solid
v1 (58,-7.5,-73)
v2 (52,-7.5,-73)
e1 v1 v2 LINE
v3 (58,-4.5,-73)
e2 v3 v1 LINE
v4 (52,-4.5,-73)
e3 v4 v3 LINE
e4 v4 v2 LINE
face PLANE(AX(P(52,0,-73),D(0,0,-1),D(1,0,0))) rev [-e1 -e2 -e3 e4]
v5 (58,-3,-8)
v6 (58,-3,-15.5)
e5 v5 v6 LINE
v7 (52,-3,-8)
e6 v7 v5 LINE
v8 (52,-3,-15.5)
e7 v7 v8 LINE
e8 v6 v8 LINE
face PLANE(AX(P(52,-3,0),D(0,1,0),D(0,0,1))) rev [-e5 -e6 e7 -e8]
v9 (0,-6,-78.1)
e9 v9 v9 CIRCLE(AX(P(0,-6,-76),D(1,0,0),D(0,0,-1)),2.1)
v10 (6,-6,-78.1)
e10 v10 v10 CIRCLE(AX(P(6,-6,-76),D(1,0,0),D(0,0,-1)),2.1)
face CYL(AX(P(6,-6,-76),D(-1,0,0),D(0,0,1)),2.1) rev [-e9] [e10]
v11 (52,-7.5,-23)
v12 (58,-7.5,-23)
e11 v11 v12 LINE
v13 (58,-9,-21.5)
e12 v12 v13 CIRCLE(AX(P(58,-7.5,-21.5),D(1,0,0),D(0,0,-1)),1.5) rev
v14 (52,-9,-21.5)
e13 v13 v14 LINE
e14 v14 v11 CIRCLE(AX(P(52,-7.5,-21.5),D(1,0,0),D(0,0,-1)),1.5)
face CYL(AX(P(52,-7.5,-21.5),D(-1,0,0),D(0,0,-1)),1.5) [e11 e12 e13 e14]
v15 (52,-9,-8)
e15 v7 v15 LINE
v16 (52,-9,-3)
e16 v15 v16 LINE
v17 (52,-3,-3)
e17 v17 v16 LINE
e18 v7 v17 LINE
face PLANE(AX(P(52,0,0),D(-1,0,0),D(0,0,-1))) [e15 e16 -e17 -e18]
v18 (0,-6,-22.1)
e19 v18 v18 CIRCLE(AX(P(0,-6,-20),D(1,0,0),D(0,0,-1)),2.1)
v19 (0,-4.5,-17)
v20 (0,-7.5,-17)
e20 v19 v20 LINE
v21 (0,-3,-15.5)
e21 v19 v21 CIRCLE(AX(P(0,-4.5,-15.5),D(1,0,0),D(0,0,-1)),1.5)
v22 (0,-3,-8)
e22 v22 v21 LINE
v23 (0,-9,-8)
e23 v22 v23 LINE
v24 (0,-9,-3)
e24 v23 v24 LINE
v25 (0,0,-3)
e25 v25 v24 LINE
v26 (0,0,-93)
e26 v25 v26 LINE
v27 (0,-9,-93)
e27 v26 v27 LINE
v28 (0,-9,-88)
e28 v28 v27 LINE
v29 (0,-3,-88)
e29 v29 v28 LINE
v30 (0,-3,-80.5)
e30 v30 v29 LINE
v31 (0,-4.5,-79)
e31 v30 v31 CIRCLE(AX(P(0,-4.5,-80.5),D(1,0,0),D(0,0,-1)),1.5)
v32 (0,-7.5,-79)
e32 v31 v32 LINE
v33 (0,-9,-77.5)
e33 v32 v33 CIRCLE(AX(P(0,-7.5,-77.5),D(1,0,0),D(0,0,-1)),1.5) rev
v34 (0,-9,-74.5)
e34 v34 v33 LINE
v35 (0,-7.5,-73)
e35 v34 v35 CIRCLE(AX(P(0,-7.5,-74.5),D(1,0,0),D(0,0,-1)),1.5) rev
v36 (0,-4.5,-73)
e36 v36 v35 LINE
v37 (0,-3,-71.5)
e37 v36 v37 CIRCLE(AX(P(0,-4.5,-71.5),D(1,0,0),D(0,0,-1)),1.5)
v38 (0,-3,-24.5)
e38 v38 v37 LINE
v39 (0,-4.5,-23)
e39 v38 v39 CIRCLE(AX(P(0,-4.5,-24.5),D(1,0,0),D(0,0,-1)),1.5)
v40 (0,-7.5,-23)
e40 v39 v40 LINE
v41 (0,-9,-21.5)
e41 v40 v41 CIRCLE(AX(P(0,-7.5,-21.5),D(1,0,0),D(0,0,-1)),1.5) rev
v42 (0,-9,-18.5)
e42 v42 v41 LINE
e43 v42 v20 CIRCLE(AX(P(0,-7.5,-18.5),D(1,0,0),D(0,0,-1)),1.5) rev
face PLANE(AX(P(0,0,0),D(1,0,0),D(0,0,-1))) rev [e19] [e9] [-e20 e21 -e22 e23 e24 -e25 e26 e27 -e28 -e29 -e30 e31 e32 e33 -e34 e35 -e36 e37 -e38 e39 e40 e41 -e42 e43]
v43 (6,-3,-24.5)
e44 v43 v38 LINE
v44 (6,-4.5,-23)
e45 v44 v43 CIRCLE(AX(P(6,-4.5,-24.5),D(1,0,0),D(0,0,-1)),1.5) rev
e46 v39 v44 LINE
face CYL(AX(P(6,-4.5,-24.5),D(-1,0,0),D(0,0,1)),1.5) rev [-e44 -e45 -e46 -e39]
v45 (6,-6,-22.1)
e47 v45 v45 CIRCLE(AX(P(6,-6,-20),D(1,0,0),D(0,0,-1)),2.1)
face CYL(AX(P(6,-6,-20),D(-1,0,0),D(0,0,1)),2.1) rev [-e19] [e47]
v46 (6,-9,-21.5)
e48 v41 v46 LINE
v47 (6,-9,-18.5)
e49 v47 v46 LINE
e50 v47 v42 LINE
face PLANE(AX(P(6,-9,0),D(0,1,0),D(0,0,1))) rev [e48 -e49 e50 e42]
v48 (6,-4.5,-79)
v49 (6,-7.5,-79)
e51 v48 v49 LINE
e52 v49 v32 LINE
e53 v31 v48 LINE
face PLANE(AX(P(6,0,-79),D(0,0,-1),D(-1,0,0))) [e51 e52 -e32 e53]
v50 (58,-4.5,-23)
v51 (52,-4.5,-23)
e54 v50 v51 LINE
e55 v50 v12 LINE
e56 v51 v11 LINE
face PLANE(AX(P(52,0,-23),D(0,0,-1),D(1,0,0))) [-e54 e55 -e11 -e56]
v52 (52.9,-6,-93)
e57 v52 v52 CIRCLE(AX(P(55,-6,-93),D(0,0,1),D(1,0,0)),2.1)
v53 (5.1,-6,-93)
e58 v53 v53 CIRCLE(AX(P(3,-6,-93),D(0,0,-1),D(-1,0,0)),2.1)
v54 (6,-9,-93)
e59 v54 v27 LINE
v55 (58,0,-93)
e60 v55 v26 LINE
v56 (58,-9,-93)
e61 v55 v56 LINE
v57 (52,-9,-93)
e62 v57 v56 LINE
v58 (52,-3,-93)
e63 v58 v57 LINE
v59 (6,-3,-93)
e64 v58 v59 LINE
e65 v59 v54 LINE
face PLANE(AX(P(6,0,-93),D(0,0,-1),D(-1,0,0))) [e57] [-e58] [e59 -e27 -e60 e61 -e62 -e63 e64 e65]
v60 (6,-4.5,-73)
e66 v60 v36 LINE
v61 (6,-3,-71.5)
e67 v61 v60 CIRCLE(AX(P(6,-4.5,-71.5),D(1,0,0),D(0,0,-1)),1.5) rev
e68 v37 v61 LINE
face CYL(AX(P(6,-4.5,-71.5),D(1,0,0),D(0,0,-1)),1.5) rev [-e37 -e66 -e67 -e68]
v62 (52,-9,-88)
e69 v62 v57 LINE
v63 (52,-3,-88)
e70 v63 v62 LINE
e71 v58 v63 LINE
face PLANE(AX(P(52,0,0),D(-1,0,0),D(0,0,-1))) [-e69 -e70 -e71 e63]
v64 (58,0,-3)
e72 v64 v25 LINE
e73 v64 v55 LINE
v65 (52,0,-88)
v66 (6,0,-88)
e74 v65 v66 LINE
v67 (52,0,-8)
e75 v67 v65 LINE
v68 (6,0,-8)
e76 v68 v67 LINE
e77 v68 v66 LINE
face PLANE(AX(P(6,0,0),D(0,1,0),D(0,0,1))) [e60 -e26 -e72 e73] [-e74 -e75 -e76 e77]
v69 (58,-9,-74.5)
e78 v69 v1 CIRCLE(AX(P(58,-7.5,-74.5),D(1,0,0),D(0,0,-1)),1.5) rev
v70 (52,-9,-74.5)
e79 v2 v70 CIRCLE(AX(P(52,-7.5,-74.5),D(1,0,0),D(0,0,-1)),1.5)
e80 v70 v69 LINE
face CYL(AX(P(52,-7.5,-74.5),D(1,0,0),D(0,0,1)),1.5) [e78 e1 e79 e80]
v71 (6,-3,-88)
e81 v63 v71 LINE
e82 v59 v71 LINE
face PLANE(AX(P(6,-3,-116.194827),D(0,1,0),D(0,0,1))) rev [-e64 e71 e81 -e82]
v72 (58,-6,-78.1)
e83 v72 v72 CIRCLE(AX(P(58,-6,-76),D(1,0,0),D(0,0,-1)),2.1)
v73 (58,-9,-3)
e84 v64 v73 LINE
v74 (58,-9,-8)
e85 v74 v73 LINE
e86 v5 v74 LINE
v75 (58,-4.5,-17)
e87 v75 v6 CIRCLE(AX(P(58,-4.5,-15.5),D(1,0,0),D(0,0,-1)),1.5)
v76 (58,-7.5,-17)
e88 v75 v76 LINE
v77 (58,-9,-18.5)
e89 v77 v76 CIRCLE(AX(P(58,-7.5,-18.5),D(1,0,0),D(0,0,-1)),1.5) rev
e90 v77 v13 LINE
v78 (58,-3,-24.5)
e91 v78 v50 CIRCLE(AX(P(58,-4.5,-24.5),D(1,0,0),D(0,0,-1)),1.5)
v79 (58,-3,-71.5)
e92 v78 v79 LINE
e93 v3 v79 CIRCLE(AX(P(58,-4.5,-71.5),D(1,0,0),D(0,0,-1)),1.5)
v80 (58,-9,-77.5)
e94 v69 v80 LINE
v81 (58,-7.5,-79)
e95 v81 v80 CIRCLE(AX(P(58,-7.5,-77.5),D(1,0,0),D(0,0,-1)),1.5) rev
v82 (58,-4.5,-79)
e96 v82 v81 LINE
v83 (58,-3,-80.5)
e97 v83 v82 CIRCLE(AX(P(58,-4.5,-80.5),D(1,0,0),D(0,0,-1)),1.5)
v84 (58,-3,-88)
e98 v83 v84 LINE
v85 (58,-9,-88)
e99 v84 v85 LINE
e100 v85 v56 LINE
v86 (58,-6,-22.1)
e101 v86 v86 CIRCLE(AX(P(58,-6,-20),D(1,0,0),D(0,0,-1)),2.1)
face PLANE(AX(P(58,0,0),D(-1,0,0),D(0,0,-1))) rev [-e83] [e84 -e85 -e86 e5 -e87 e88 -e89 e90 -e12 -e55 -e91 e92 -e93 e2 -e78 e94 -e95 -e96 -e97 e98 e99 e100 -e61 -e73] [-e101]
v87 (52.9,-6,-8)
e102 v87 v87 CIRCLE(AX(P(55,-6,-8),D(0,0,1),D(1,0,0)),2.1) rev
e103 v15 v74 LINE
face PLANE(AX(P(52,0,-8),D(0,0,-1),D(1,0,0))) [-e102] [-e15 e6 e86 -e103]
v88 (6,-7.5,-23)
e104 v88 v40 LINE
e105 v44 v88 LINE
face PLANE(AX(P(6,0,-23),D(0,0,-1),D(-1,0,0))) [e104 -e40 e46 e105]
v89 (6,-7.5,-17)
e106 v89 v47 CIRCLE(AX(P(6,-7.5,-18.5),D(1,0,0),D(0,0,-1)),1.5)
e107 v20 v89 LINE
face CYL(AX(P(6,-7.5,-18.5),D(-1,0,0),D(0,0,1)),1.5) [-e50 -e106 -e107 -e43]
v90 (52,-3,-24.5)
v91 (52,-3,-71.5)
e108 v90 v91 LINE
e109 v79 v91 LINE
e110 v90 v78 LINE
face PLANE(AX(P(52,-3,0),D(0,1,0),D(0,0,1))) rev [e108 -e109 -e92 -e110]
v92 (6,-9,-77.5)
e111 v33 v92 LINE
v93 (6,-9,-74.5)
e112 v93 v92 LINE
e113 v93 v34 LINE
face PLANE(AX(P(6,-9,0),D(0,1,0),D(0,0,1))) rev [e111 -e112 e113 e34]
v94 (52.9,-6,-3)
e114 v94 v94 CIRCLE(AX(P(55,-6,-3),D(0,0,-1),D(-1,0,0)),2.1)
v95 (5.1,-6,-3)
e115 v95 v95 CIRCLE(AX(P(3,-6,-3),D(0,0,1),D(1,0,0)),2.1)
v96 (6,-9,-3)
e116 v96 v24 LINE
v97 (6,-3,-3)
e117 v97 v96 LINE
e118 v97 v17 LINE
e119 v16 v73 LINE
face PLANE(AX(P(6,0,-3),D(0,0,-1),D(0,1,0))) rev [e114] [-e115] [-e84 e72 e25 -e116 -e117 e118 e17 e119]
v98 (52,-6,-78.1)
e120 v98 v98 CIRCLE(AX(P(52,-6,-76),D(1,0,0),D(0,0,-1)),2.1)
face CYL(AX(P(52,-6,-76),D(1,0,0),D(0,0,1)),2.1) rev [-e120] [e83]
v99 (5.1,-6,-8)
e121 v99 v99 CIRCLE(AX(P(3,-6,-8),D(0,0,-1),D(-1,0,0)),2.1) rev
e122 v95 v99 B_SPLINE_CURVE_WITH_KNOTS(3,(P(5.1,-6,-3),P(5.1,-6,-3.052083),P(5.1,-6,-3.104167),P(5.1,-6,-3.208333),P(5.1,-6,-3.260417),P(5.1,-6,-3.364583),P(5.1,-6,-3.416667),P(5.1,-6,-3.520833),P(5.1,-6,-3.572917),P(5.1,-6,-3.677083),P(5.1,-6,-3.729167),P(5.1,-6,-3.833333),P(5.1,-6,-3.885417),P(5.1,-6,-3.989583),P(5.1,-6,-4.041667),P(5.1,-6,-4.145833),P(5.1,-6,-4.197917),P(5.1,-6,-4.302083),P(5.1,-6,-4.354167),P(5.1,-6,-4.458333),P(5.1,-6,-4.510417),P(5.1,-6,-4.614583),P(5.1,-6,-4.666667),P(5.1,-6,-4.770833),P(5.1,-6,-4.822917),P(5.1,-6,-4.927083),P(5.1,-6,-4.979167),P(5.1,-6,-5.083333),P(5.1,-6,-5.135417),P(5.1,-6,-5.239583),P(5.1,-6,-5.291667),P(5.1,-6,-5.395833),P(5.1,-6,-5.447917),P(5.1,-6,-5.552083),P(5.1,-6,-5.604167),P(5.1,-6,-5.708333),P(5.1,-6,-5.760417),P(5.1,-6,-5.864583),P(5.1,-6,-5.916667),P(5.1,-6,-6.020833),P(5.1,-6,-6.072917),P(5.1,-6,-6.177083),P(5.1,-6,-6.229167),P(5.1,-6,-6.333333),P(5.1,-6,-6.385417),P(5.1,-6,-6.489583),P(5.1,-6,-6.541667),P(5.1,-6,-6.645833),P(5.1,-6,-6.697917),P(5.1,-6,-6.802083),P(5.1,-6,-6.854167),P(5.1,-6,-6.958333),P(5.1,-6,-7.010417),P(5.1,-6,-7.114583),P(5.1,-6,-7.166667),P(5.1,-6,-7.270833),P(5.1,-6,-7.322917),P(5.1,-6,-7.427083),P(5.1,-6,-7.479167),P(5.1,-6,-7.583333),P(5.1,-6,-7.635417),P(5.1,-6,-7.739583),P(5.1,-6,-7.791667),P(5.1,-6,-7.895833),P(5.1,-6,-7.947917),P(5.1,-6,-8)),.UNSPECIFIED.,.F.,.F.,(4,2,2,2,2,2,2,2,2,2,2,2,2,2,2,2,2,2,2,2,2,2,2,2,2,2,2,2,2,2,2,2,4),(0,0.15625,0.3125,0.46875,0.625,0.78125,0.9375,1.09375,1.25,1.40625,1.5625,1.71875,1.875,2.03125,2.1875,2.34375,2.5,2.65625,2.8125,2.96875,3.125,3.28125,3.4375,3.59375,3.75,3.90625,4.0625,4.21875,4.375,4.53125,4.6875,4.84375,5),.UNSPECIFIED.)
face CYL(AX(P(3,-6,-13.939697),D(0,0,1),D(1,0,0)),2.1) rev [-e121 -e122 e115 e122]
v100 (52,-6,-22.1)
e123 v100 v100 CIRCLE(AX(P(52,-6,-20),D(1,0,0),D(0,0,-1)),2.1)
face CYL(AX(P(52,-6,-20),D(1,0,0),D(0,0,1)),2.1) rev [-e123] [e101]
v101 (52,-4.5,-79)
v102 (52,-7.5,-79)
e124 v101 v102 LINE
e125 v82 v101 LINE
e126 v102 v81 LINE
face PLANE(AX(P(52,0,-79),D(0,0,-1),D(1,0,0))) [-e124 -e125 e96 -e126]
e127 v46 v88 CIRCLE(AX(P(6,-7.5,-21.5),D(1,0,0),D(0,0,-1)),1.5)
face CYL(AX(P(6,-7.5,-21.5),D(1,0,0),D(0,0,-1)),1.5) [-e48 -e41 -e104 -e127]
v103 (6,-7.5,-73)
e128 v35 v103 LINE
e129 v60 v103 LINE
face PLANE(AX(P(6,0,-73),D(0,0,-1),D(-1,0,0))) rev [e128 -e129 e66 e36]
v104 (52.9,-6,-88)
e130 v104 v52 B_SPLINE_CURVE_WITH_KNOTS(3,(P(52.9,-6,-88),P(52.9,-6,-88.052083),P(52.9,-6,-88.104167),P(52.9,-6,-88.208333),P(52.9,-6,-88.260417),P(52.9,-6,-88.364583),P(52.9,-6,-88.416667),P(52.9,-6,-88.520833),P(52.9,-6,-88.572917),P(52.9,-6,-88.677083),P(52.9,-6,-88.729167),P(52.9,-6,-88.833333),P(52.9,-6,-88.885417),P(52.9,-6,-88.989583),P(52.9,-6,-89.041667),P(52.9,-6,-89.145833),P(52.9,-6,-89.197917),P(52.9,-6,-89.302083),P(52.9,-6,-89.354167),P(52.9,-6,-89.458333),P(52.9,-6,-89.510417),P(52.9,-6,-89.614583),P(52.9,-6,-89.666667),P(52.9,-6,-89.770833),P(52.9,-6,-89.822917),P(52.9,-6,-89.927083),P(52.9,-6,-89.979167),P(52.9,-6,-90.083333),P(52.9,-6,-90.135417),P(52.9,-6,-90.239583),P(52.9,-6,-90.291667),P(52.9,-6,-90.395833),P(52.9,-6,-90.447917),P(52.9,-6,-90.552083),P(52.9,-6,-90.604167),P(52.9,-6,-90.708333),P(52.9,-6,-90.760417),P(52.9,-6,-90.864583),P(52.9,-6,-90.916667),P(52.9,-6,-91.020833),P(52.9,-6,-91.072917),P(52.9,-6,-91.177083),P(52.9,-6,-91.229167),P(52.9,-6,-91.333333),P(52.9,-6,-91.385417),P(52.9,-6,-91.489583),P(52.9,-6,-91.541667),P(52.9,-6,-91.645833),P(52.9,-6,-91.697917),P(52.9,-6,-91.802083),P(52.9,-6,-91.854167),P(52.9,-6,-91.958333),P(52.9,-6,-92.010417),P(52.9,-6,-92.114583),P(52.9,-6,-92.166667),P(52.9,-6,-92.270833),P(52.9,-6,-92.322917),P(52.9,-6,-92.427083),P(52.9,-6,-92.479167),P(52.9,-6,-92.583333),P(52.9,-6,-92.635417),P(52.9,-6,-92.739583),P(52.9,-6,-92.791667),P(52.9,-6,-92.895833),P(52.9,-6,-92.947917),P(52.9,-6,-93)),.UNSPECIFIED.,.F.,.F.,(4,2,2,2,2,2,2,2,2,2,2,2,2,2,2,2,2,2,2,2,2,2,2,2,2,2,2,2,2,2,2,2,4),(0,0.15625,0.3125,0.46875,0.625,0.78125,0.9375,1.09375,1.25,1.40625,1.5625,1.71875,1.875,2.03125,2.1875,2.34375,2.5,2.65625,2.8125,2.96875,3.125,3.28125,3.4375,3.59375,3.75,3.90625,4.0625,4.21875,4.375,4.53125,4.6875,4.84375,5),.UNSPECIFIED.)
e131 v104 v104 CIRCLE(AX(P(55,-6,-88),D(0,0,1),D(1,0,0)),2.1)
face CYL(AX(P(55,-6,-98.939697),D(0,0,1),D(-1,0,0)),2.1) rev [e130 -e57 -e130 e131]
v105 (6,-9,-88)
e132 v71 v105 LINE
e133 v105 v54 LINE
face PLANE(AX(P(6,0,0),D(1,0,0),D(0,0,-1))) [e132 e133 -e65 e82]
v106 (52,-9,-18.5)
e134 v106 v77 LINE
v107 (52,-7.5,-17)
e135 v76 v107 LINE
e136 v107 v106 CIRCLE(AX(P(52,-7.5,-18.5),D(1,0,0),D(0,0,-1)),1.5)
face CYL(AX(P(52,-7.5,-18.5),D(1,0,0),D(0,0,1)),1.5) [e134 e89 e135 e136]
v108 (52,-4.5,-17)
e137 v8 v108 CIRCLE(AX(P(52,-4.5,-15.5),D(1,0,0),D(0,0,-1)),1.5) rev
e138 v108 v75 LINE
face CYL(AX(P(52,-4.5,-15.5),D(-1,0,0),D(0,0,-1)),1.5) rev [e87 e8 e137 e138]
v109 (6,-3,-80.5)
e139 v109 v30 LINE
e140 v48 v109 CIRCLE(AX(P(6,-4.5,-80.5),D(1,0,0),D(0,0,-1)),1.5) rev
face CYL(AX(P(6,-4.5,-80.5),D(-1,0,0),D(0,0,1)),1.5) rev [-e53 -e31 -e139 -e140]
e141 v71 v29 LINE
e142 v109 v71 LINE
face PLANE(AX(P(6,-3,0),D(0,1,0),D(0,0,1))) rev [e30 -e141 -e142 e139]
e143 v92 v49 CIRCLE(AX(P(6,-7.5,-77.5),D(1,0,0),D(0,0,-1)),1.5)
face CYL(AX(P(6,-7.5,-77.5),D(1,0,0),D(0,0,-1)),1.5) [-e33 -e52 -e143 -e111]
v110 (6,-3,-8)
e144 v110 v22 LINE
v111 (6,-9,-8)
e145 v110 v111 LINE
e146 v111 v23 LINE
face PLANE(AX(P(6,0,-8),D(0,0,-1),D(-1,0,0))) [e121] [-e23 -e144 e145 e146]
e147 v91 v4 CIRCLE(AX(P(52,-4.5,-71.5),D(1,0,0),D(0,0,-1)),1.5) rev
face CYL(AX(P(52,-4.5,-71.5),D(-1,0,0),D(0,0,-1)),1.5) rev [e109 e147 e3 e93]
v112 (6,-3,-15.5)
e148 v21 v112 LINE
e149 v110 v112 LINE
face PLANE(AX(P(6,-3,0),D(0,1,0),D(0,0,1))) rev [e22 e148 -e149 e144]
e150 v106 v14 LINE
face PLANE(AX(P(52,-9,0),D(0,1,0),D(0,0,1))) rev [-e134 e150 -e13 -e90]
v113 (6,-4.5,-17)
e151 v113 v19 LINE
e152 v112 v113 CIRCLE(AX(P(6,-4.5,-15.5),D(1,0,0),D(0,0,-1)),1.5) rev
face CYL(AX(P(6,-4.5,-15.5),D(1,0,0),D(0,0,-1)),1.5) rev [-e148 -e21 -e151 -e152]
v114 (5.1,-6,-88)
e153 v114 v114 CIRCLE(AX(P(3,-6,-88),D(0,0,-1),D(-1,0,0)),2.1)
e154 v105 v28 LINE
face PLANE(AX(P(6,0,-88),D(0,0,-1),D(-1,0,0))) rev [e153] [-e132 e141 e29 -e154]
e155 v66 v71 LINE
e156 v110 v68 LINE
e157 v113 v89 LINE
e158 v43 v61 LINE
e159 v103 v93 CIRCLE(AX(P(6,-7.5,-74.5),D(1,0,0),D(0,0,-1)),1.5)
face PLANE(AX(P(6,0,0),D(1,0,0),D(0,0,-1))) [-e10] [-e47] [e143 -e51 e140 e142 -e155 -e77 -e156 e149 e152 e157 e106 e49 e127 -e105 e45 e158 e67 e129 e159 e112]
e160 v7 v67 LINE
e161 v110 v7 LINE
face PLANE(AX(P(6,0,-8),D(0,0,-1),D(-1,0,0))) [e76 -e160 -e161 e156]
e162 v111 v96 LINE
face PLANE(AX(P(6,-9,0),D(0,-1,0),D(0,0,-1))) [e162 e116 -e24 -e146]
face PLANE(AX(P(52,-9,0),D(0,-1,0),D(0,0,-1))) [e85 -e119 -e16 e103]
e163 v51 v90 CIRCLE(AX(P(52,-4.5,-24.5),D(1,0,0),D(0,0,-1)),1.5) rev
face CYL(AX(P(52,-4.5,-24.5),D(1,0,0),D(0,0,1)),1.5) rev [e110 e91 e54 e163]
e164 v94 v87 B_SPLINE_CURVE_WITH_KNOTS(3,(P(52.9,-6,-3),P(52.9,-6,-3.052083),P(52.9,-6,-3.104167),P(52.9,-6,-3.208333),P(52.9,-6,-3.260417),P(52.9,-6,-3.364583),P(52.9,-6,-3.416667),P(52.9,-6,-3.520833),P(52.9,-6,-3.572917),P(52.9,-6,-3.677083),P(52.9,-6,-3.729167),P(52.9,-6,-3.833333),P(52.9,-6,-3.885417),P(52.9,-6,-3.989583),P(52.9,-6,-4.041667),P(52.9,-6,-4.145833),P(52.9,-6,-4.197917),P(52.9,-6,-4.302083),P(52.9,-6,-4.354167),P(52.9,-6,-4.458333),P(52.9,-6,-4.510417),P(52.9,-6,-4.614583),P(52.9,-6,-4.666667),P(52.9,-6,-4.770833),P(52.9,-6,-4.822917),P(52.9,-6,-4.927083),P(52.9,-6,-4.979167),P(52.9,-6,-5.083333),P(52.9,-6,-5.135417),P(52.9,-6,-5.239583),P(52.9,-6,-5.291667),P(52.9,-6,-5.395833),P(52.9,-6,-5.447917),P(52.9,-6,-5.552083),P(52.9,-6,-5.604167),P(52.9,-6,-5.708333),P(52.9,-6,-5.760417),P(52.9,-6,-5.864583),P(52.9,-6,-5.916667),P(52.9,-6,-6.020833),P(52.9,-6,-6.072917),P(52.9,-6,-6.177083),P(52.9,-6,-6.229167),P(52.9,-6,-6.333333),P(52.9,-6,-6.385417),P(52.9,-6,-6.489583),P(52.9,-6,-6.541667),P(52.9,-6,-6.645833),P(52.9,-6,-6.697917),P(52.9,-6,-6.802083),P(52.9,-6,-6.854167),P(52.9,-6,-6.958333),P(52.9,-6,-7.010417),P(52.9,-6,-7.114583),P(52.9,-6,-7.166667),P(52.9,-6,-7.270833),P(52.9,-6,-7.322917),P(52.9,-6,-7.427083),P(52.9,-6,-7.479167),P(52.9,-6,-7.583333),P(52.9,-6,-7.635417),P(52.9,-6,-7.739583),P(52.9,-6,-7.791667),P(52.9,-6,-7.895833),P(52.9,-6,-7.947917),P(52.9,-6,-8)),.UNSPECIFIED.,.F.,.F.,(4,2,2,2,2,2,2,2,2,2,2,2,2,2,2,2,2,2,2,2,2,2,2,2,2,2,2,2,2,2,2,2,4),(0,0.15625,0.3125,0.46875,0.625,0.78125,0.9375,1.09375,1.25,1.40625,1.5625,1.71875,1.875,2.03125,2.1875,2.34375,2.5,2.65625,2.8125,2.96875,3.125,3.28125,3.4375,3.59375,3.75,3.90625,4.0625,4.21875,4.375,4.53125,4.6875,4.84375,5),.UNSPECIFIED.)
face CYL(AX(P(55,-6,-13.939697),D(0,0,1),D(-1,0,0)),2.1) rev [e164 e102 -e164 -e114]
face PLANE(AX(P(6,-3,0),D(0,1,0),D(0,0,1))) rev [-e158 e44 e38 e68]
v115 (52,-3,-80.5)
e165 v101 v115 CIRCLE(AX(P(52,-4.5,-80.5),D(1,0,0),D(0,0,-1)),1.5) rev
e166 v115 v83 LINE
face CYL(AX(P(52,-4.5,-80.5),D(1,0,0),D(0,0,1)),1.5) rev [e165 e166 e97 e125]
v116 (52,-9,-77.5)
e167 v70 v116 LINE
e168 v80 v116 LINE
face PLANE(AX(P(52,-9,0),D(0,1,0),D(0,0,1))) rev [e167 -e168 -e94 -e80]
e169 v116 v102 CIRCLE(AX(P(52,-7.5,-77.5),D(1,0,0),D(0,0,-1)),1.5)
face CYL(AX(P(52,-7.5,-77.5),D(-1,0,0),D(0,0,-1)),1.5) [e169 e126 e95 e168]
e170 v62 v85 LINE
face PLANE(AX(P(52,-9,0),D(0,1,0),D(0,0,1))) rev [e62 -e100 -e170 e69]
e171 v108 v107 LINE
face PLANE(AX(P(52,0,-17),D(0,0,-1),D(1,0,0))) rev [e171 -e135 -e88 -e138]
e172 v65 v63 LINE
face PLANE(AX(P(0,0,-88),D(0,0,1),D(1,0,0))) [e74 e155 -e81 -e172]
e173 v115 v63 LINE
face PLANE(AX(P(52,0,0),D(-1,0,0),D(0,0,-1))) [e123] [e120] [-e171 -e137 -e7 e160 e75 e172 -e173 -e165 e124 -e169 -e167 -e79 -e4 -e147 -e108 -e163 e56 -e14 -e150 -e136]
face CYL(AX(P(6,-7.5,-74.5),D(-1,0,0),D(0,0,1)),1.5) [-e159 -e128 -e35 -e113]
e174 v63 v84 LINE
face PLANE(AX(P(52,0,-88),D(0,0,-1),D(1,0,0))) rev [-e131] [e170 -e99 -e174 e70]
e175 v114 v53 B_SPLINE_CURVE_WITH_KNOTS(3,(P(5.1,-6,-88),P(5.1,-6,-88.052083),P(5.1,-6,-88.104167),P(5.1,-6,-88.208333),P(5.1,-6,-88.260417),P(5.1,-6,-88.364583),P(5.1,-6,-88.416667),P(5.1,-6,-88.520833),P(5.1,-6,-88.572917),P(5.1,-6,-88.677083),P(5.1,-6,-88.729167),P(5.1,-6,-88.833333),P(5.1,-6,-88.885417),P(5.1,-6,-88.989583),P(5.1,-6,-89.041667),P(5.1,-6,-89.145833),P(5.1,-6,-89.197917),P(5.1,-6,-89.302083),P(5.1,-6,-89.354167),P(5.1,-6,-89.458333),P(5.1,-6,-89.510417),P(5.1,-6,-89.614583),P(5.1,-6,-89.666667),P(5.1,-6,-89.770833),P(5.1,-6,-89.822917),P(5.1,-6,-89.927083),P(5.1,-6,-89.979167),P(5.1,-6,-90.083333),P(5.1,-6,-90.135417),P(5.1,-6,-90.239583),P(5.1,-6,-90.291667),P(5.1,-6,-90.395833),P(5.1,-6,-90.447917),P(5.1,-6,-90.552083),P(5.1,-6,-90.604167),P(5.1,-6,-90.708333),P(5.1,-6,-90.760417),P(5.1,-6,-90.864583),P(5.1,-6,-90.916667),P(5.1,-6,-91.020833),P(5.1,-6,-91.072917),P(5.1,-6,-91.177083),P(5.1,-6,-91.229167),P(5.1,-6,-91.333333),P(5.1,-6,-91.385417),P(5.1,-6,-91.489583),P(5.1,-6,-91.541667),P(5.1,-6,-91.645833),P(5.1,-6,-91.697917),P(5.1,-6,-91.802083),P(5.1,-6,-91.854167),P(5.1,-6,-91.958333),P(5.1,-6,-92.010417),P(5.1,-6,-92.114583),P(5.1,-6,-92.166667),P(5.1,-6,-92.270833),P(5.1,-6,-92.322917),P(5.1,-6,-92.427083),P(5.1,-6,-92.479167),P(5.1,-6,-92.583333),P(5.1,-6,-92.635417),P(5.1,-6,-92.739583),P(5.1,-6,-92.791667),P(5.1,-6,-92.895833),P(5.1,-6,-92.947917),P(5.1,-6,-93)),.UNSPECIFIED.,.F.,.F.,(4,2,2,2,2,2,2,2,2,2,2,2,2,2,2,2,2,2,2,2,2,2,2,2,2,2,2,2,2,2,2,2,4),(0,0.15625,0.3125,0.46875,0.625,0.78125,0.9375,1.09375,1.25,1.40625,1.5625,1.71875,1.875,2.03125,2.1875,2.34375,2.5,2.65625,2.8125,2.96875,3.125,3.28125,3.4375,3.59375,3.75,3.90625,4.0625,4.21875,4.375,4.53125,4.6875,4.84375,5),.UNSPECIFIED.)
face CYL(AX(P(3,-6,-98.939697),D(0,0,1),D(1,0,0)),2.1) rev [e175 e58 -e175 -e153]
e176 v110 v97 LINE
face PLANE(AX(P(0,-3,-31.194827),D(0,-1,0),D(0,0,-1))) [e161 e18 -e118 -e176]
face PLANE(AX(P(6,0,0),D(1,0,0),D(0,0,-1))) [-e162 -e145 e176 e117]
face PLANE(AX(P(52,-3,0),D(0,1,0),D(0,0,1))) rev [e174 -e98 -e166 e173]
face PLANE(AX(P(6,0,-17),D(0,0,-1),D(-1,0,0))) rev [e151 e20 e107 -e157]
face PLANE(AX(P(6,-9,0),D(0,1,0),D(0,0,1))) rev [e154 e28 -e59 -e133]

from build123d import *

# Parameters (mm, degrees)
SKETCH1_R               = 2.1
BOSS_EXTRUDE1_DEPTH     = 6
FILLET1_R               = 1.5
SKETCH2_R               = 2.1
CUT_EXTRUDE1_DEPTH      = 5
CUT_EXTRUDE2_START      = -85
SKETCH2_2_R             = 2.1
CUT_EXTRUDE2_DEPTH      = 5
SKETCH4_W               = 23
SKETCH4_H               = 3
BOSS_EXTRUDE2_DEPTH     = 5
BOSS_EXTRUDE3_START     = -3
BOSS_EXTRUDE3_OUTLINE_W = 23
BOSS_EXTRUDE3_OUTLINE_H = 5
BOSS_EXTRUDE3_DEPTH     = 3


# Read off the part's stored shape, not the designer's step: Boss-Extrude3
with BuildPart() as part:
    # Sketch1 → Boss-Extrude1 (new body)
    with BuildSketch(Plane(origin=(0, 0, 0), x_dir=(0, 0, -1), z_dir=(1, 0, 0))):
        Polygon((84, 0), (3, 0), (3, -9), (8, -9), (8, -3), (17, -3), (17, -9), (23, -9), (23, -3), (73, -3), (73, -9), (79, -9), (79, -3), (88, -3), (88, -9), (93, -9), (93, 0), align=None)
        with Locations((20, -6)):
            Circle(SKETCH1_R, mode=Mode.SUBTRACT)
        with Locations((76, -6)):
            Circle(SKETCH1_R, mode=Mode.SUBTRACT)
    extrude(amount=BOSS_EXTRUDE1_DEPTH)

    # Fillet1
    fillet1_edges = [part.edges().sort_by_distance(p)[0] for p in [
        (3, -9, -23),
        (3, -9, -17),
        (3, -3, -17),
        (3, -3, -79),
        (3, -9, -79),
        (3, -9, -73),
        (3, -3, -73),
        (3, -3, -23),
    ]]
    fillet(fillet1_edges, radius=FILLET1_R)

    # Sketch2 → Cut-Extrude1 (cut)
    with BuildSketch(Plane.XY.offset(-3)):
        with Locations((3, -6)):
            Circle(SKETCH2_R)
    extrude(amount=-CUT_EXTRUDE1_DEPTH, mode=Mode.SUBTRACT)

    # Sketch2<2> → Cut-Extrude2 (cut)
    with BuildSketch(Plane.XY.offset(-3).offset(CUT_EXTRUDE2_START)):
        with Locations((3, -6)):
            Circle(SKETCH2_2_R)
    extrude(amount=-CUT_EXTRUDE2_DEPTH, mode=Mode.SUBTRACT)

    # Sketch4 → Boss-Extrude2 (add)
    with BuildSketch(Plane.XY.offset(-3)):
        with Locations((17.5, -1.5)):
            Rectangle(SKETCH4_W, SKETCH4_H)
    extrude(amount=-BOSS_EXTRUDE2_DEPTH)

    # Boss-Extrude3 outline → Boss-Extrude3 (add)
    with BuildSketch(Plane(origin=(0, 0, 0), x_dir=(1, 0, 0), z_dir=(0, 1, 0)).offset(BOSS_EXTRUDE3_START)):
        with Locations((17.5, 90.5)):
            Rectangle(BOSS_EXTRUDE3_OUTLINE_W, BOSS_EXTRUDE3_OUTLINE_H)
    extrude(amount=BOSS_EXTRUDE3_DEPTH)

    # Mirror1: part across plane


with BuildPart() as part_1:
    add(part.part)
    add(part.part.mirror(Plane(origin=(29, 0, 0), x_dir=(0, 0, 1), z_dir=(1, 0, 0))))


solid = part_1.part
